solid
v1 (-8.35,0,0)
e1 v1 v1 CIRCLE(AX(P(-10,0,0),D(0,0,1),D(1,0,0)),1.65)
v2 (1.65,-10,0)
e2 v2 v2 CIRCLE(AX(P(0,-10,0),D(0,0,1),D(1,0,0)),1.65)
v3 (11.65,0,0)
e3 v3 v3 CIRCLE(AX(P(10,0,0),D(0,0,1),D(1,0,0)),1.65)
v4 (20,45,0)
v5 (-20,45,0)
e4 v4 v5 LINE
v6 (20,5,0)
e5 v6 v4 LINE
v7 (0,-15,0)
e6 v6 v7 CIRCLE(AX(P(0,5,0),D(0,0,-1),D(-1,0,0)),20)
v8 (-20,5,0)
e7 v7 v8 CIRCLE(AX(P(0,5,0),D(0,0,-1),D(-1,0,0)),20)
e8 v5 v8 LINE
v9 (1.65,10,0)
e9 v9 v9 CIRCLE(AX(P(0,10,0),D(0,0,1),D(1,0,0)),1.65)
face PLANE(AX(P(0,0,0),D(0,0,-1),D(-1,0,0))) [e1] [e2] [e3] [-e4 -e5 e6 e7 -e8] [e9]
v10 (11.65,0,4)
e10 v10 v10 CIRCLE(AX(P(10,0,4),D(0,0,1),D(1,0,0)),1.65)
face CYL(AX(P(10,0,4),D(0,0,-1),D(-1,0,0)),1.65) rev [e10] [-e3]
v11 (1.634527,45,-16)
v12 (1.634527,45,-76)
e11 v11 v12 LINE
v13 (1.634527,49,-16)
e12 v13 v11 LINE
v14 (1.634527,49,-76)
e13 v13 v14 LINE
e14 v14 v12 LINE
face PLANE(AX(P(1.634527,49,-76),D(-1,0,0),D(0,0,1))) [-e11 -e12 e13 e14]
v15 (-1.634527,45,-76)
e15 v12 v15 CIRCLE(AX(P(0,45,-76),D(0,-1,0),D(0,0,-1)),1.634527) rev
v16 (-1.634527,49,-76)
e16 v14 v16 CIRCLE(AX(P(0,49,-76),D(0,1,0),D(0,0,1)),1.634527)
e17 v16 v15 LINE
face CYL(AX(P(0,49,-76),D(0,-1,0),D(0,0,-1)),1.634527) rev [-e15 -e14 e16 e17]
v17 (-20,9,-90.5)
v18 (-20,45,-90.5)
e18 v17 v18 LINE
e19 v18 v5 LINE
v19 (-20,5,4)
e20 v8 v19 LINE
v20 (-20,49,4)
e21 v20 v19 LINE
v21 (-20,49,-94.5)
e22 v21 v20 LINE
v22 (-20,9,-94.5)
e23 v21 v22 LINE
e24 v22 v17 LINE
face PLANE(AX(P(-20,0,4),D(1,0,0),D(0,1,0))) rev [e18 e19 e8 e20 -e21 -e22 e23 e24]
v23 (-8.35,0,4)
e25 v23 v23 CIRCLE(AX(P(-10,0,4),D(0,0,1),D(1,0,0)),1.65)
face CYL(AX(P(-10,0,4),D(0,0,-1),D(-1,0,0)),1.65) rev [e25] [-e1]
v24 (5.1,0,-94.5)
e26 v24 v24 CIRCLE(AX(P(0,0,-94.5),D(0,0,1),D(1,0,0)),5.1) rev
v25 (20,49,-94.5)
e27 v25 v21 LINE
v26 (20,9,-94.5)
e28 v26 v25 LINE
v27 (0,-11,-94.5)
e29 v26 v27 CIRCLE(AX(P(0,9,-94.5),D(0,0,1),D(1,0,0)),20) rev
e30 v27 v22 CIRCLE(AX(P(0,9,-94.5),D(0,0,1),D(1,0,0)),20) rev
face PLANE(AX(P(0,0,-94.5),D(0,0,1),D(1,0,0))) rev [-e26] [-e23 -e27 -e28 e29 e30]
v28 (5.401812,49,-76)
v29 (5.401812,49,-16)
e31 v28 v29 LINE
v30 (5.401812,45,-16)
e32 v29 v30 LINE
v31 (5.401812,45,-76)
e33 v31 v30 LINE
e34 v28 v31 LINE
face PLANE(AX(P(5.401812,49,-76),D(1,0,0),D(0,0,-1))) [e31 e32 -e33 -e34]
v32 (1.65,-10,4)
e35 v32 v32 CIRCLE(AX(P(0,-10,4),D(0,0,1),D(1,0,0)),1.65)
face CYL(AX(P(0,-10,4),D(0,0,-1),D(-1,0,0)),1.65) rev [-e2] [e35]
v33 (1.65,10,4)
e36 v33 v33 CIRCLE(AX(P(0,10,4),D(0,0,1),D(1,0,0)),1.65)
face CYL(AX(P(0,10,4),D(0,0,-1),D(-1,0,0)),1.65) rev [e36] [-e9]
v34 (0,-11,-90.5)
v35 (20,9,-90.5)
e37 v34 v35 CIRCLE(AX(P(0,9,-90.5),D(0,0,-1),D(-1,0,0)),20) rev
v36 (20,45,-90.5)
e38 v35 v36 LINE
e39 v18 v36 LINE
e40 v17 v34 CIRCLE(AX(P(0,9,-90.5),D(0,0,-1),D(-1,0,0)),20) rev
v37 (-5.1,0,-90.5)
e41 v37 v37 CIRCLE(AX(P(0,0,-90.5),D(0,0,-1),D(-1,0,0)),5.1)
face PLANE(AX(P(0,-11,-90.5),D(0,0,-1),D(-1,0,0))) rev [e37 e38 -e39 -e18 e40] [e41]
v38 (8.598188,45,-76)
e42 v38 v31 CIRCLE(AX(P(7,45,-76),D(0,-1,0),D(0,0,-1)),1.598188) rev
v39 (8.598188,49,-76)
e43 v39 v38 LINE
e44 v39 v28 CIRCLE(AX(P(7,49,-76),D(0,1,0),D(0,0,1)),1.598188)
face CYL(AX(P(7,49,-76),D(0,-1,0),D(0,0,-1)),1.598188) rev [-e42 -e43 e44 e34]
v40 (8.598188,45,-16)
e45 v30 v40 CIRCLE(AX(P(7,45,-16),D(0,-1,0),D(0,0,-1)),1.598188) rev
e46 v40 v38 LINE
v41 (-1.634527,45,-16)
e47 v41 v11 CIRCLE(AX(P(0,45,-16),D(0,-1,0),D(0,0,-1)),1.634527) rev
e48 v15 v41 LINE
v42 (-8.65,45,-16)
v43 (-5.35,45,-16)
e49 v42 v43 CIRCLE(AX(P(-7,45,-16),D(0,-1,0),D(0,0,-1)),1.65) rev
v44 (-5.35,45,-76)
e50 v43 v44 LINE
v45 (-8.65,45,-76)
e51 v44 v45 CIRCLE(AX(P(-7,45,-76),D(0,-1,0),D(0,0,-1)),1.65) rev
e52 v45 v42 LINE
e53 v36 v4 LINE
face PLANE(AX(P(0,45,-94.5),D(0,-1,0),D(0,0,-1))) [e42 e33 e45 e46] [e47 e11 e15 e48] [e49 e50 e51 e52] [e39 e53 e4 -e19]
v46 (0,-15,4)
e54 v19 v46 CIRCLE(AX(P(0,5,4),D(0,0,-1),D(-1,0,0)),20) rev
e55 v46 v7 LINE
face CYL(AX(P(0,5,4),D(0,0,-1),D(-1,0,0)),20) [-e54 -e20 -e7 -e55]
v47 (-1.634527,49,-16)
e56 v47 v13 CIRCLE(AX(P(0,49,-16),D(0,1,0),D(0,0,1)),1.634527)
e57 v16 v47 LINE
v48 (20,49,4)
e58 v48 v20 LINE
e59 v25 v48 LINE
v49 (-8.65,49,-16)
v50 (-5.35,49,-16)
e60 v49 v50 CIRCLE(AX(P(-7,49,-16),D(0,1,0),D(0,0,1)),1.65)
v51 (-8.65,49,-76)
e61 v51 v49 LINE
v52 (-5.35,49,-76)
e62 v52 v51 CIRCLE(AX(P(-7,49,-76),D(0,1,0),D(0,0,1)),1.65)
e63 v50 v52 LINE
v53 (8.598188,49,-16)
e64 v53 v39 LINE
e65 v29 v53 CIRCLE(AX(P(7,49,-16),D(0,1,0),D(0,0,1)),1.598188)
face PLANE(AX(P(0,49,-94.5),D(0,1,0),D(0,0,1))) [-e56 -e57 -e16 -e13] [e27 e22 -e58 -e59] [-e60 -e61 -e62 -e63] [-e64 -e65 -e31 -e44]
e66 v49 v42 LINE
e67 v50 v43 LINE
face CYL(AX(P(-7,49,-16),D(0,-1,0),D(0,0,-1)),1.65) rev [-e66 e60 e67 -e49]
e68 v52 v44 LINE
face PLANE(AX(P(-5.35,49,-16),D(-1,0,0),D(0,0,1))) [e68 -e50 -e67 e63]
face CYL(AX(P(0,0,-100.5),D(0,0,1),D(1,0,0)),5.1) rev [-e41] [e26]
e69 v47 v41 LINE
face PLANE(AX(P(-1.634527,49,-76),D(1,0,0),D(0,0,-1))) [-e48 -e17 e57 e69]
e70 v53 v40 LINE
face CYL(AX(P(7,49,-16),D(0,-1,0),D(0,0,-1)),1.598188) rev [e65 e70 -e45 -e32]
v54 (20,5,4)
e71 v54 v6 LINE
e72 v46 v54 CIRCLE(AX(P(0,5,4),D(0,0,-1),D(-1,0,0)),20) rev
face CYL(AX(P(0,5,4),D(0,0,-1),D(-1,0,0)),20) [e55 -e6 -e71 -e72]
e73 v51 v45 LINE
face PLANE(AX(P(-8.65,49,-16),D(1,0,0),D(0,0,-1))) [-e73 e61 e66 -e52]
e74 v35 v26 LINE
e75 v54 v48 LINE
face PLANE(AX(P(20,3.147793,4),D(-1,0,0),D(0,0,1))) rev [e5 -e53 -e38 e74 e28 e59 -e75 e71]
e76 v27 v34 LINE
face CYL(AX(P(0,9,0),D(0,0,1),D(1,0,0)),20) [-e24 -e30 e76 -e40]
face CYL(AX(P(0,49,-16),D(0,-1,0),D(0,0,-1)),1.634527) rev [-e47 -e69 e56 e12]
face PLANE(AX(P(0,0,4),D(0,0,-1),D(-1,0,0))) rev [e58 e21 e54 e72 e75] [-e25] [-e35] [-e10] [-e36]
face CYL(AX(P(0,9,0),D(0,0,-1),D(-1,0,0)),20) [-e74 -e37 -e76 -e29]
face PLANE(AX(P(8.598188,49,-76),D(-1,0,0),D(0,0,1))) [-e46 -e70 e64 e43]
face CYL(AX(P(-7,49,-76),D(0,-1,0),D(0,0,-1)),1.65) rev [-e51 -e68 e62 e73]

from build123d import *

# Parameters (mm, degrees)
SKETCH_1_R          = 1.65
EXTRUDE_1_DEPTH     = 4
EXTRUDE_START       = 4
SKETCH_2_W          = 40
SKETCH_2_H          = 4
EXTRUDE_2_DEPTH     = 98.5
EXTRUDE_START_2     = 49
SKETCH_4_W          = 40
SKETCH_4_H          = 4
EXTRUDE_3_DEPTH     = 60
FILLET_1_R          = 20
CUT_EXTRUDE_2_DEPTH = 109.310895112
CUT_EXTRUDE_START   = -90.5
SKETCH_8_R          = 5.1
CUT_EXTRUDE_3_DEPTH = 10


with BuildPart() as part:
    # 草图1 → 凸台-拉伸1 (new body)
    with BuildSketch(Plane.XY):
        Polygon((-20, 0), (-20, -15), (20, -15), (20, 3.147792708), (20, 45), (-20, 45), align=None)
        with Locations((-10, 0)):
            Circle(SKETCH_1_R, mode=Mode.SUBTRACT)
        with Locations((0, 10)):
            Circle(SKETCH_1_R, mode=Mode.SUBTRACT)
        with Locations((0, -10)):
            Circle(SKETCH_1_R, mode=Mode.SUBTRACT)
        with Locations((10, 0)):
            Circle(SKETCH_1_R, mode=Mode.SUBTRACT)
    extrude(amount=EXTRUDE_1_DEPTH)

    # 草图2 → 凸台-拉伸2 (add)
    with BuildSketch(Plane.XY.offset(EXTRUDE_START)):
        with Locations((0, 47)):
            Rectangle(SKETCH_2_W, SKETCH_2_H)
    extrude(amount=-EXTRUDE_2_DEPTH)

    # 草图4 → 凸台-拉伸3 (add)
    with BuildSketch(Plane(origin=(0, 0, 0), x_dir=(1, 0, 0), z_dir=(0, 1, 0)).offset(EXTRUDE_START_2)):
        with Locations((0, 92.5)):
            Rectangle(SKETCH_4_W, SKETCH_4_H)
    extrude(amount=-EXTRUDE_3_DEPTH)

    # 圆角1
    fillet_1_edges = [part.edges().sort_by_distance(p)[0] for p in [
        (-20, -11, -92.5),
        (20, -11, -92.5),
        (20, -15, 2),
        (-20, -15, 2),
    ]]
    fillet(fillet_1_edges, radius=FILLET_1_R - 0.0001)  # a hair under: the kernel refuses the full size

    # 草图6 → 切除-拉伸2 (cut, through all)
    with BuildSketch(Plane(origin=(0, 0, 0), x_dir=(1, 0, 0), z_dir=(0, 1, 0))):
        with BuildLine():
            Line((-8.65, 16), (-8.65, 76))
            ThreePointArc((-8.65, 76), (-7, 77.65), (-5.35, 76))
            Line((-5.35, 76), (-5.35, 16))
            ThreePointArc((-5.35, 16), (-7, 14.35), (-8.65, 16))
        make_face()
        with BuildLine():
            Line((1.634526819, 76), (1.634526819, 16))
            ThreePointArc((1.634526819, 16), (0, 14.365473181), (-1.634526819, 16))
            Line((-1.634526819, 16), (-1.634526819, 76))
            ThreePointArc((-1.634526819, 76), (0, 77.634526819), (1.634526819, 76))
        make_face()
        with BuildLine():
            Line((8.598187679, 76), (8.598187679, 16))
            ThreePointArc((8.598187679, 16), (7, 14.401812321), (5.401812321, 16))
            Line((5.401812321, 16), (5.401812321, 76))
            ThreePointArc((5.401812321, 76), (7, 77.598187679), (8.598187679, 76))
        make_face()
    extrude(amount=CUT_EXTRUDE_2_DEPTH, mode=Mode.SUBTRACT)

    # 草图8 → 切除-拉伸3 (cut)
    with BuildSketch(Plane.XY.offset(CUT_EXTRUDE_START)):
        Circle(SKETCH_8_R)
    extrude(amount=-CUT_EXTRUDE_3_DEPTH, mode=Mode.SUBTRACT)


solid = part.part
